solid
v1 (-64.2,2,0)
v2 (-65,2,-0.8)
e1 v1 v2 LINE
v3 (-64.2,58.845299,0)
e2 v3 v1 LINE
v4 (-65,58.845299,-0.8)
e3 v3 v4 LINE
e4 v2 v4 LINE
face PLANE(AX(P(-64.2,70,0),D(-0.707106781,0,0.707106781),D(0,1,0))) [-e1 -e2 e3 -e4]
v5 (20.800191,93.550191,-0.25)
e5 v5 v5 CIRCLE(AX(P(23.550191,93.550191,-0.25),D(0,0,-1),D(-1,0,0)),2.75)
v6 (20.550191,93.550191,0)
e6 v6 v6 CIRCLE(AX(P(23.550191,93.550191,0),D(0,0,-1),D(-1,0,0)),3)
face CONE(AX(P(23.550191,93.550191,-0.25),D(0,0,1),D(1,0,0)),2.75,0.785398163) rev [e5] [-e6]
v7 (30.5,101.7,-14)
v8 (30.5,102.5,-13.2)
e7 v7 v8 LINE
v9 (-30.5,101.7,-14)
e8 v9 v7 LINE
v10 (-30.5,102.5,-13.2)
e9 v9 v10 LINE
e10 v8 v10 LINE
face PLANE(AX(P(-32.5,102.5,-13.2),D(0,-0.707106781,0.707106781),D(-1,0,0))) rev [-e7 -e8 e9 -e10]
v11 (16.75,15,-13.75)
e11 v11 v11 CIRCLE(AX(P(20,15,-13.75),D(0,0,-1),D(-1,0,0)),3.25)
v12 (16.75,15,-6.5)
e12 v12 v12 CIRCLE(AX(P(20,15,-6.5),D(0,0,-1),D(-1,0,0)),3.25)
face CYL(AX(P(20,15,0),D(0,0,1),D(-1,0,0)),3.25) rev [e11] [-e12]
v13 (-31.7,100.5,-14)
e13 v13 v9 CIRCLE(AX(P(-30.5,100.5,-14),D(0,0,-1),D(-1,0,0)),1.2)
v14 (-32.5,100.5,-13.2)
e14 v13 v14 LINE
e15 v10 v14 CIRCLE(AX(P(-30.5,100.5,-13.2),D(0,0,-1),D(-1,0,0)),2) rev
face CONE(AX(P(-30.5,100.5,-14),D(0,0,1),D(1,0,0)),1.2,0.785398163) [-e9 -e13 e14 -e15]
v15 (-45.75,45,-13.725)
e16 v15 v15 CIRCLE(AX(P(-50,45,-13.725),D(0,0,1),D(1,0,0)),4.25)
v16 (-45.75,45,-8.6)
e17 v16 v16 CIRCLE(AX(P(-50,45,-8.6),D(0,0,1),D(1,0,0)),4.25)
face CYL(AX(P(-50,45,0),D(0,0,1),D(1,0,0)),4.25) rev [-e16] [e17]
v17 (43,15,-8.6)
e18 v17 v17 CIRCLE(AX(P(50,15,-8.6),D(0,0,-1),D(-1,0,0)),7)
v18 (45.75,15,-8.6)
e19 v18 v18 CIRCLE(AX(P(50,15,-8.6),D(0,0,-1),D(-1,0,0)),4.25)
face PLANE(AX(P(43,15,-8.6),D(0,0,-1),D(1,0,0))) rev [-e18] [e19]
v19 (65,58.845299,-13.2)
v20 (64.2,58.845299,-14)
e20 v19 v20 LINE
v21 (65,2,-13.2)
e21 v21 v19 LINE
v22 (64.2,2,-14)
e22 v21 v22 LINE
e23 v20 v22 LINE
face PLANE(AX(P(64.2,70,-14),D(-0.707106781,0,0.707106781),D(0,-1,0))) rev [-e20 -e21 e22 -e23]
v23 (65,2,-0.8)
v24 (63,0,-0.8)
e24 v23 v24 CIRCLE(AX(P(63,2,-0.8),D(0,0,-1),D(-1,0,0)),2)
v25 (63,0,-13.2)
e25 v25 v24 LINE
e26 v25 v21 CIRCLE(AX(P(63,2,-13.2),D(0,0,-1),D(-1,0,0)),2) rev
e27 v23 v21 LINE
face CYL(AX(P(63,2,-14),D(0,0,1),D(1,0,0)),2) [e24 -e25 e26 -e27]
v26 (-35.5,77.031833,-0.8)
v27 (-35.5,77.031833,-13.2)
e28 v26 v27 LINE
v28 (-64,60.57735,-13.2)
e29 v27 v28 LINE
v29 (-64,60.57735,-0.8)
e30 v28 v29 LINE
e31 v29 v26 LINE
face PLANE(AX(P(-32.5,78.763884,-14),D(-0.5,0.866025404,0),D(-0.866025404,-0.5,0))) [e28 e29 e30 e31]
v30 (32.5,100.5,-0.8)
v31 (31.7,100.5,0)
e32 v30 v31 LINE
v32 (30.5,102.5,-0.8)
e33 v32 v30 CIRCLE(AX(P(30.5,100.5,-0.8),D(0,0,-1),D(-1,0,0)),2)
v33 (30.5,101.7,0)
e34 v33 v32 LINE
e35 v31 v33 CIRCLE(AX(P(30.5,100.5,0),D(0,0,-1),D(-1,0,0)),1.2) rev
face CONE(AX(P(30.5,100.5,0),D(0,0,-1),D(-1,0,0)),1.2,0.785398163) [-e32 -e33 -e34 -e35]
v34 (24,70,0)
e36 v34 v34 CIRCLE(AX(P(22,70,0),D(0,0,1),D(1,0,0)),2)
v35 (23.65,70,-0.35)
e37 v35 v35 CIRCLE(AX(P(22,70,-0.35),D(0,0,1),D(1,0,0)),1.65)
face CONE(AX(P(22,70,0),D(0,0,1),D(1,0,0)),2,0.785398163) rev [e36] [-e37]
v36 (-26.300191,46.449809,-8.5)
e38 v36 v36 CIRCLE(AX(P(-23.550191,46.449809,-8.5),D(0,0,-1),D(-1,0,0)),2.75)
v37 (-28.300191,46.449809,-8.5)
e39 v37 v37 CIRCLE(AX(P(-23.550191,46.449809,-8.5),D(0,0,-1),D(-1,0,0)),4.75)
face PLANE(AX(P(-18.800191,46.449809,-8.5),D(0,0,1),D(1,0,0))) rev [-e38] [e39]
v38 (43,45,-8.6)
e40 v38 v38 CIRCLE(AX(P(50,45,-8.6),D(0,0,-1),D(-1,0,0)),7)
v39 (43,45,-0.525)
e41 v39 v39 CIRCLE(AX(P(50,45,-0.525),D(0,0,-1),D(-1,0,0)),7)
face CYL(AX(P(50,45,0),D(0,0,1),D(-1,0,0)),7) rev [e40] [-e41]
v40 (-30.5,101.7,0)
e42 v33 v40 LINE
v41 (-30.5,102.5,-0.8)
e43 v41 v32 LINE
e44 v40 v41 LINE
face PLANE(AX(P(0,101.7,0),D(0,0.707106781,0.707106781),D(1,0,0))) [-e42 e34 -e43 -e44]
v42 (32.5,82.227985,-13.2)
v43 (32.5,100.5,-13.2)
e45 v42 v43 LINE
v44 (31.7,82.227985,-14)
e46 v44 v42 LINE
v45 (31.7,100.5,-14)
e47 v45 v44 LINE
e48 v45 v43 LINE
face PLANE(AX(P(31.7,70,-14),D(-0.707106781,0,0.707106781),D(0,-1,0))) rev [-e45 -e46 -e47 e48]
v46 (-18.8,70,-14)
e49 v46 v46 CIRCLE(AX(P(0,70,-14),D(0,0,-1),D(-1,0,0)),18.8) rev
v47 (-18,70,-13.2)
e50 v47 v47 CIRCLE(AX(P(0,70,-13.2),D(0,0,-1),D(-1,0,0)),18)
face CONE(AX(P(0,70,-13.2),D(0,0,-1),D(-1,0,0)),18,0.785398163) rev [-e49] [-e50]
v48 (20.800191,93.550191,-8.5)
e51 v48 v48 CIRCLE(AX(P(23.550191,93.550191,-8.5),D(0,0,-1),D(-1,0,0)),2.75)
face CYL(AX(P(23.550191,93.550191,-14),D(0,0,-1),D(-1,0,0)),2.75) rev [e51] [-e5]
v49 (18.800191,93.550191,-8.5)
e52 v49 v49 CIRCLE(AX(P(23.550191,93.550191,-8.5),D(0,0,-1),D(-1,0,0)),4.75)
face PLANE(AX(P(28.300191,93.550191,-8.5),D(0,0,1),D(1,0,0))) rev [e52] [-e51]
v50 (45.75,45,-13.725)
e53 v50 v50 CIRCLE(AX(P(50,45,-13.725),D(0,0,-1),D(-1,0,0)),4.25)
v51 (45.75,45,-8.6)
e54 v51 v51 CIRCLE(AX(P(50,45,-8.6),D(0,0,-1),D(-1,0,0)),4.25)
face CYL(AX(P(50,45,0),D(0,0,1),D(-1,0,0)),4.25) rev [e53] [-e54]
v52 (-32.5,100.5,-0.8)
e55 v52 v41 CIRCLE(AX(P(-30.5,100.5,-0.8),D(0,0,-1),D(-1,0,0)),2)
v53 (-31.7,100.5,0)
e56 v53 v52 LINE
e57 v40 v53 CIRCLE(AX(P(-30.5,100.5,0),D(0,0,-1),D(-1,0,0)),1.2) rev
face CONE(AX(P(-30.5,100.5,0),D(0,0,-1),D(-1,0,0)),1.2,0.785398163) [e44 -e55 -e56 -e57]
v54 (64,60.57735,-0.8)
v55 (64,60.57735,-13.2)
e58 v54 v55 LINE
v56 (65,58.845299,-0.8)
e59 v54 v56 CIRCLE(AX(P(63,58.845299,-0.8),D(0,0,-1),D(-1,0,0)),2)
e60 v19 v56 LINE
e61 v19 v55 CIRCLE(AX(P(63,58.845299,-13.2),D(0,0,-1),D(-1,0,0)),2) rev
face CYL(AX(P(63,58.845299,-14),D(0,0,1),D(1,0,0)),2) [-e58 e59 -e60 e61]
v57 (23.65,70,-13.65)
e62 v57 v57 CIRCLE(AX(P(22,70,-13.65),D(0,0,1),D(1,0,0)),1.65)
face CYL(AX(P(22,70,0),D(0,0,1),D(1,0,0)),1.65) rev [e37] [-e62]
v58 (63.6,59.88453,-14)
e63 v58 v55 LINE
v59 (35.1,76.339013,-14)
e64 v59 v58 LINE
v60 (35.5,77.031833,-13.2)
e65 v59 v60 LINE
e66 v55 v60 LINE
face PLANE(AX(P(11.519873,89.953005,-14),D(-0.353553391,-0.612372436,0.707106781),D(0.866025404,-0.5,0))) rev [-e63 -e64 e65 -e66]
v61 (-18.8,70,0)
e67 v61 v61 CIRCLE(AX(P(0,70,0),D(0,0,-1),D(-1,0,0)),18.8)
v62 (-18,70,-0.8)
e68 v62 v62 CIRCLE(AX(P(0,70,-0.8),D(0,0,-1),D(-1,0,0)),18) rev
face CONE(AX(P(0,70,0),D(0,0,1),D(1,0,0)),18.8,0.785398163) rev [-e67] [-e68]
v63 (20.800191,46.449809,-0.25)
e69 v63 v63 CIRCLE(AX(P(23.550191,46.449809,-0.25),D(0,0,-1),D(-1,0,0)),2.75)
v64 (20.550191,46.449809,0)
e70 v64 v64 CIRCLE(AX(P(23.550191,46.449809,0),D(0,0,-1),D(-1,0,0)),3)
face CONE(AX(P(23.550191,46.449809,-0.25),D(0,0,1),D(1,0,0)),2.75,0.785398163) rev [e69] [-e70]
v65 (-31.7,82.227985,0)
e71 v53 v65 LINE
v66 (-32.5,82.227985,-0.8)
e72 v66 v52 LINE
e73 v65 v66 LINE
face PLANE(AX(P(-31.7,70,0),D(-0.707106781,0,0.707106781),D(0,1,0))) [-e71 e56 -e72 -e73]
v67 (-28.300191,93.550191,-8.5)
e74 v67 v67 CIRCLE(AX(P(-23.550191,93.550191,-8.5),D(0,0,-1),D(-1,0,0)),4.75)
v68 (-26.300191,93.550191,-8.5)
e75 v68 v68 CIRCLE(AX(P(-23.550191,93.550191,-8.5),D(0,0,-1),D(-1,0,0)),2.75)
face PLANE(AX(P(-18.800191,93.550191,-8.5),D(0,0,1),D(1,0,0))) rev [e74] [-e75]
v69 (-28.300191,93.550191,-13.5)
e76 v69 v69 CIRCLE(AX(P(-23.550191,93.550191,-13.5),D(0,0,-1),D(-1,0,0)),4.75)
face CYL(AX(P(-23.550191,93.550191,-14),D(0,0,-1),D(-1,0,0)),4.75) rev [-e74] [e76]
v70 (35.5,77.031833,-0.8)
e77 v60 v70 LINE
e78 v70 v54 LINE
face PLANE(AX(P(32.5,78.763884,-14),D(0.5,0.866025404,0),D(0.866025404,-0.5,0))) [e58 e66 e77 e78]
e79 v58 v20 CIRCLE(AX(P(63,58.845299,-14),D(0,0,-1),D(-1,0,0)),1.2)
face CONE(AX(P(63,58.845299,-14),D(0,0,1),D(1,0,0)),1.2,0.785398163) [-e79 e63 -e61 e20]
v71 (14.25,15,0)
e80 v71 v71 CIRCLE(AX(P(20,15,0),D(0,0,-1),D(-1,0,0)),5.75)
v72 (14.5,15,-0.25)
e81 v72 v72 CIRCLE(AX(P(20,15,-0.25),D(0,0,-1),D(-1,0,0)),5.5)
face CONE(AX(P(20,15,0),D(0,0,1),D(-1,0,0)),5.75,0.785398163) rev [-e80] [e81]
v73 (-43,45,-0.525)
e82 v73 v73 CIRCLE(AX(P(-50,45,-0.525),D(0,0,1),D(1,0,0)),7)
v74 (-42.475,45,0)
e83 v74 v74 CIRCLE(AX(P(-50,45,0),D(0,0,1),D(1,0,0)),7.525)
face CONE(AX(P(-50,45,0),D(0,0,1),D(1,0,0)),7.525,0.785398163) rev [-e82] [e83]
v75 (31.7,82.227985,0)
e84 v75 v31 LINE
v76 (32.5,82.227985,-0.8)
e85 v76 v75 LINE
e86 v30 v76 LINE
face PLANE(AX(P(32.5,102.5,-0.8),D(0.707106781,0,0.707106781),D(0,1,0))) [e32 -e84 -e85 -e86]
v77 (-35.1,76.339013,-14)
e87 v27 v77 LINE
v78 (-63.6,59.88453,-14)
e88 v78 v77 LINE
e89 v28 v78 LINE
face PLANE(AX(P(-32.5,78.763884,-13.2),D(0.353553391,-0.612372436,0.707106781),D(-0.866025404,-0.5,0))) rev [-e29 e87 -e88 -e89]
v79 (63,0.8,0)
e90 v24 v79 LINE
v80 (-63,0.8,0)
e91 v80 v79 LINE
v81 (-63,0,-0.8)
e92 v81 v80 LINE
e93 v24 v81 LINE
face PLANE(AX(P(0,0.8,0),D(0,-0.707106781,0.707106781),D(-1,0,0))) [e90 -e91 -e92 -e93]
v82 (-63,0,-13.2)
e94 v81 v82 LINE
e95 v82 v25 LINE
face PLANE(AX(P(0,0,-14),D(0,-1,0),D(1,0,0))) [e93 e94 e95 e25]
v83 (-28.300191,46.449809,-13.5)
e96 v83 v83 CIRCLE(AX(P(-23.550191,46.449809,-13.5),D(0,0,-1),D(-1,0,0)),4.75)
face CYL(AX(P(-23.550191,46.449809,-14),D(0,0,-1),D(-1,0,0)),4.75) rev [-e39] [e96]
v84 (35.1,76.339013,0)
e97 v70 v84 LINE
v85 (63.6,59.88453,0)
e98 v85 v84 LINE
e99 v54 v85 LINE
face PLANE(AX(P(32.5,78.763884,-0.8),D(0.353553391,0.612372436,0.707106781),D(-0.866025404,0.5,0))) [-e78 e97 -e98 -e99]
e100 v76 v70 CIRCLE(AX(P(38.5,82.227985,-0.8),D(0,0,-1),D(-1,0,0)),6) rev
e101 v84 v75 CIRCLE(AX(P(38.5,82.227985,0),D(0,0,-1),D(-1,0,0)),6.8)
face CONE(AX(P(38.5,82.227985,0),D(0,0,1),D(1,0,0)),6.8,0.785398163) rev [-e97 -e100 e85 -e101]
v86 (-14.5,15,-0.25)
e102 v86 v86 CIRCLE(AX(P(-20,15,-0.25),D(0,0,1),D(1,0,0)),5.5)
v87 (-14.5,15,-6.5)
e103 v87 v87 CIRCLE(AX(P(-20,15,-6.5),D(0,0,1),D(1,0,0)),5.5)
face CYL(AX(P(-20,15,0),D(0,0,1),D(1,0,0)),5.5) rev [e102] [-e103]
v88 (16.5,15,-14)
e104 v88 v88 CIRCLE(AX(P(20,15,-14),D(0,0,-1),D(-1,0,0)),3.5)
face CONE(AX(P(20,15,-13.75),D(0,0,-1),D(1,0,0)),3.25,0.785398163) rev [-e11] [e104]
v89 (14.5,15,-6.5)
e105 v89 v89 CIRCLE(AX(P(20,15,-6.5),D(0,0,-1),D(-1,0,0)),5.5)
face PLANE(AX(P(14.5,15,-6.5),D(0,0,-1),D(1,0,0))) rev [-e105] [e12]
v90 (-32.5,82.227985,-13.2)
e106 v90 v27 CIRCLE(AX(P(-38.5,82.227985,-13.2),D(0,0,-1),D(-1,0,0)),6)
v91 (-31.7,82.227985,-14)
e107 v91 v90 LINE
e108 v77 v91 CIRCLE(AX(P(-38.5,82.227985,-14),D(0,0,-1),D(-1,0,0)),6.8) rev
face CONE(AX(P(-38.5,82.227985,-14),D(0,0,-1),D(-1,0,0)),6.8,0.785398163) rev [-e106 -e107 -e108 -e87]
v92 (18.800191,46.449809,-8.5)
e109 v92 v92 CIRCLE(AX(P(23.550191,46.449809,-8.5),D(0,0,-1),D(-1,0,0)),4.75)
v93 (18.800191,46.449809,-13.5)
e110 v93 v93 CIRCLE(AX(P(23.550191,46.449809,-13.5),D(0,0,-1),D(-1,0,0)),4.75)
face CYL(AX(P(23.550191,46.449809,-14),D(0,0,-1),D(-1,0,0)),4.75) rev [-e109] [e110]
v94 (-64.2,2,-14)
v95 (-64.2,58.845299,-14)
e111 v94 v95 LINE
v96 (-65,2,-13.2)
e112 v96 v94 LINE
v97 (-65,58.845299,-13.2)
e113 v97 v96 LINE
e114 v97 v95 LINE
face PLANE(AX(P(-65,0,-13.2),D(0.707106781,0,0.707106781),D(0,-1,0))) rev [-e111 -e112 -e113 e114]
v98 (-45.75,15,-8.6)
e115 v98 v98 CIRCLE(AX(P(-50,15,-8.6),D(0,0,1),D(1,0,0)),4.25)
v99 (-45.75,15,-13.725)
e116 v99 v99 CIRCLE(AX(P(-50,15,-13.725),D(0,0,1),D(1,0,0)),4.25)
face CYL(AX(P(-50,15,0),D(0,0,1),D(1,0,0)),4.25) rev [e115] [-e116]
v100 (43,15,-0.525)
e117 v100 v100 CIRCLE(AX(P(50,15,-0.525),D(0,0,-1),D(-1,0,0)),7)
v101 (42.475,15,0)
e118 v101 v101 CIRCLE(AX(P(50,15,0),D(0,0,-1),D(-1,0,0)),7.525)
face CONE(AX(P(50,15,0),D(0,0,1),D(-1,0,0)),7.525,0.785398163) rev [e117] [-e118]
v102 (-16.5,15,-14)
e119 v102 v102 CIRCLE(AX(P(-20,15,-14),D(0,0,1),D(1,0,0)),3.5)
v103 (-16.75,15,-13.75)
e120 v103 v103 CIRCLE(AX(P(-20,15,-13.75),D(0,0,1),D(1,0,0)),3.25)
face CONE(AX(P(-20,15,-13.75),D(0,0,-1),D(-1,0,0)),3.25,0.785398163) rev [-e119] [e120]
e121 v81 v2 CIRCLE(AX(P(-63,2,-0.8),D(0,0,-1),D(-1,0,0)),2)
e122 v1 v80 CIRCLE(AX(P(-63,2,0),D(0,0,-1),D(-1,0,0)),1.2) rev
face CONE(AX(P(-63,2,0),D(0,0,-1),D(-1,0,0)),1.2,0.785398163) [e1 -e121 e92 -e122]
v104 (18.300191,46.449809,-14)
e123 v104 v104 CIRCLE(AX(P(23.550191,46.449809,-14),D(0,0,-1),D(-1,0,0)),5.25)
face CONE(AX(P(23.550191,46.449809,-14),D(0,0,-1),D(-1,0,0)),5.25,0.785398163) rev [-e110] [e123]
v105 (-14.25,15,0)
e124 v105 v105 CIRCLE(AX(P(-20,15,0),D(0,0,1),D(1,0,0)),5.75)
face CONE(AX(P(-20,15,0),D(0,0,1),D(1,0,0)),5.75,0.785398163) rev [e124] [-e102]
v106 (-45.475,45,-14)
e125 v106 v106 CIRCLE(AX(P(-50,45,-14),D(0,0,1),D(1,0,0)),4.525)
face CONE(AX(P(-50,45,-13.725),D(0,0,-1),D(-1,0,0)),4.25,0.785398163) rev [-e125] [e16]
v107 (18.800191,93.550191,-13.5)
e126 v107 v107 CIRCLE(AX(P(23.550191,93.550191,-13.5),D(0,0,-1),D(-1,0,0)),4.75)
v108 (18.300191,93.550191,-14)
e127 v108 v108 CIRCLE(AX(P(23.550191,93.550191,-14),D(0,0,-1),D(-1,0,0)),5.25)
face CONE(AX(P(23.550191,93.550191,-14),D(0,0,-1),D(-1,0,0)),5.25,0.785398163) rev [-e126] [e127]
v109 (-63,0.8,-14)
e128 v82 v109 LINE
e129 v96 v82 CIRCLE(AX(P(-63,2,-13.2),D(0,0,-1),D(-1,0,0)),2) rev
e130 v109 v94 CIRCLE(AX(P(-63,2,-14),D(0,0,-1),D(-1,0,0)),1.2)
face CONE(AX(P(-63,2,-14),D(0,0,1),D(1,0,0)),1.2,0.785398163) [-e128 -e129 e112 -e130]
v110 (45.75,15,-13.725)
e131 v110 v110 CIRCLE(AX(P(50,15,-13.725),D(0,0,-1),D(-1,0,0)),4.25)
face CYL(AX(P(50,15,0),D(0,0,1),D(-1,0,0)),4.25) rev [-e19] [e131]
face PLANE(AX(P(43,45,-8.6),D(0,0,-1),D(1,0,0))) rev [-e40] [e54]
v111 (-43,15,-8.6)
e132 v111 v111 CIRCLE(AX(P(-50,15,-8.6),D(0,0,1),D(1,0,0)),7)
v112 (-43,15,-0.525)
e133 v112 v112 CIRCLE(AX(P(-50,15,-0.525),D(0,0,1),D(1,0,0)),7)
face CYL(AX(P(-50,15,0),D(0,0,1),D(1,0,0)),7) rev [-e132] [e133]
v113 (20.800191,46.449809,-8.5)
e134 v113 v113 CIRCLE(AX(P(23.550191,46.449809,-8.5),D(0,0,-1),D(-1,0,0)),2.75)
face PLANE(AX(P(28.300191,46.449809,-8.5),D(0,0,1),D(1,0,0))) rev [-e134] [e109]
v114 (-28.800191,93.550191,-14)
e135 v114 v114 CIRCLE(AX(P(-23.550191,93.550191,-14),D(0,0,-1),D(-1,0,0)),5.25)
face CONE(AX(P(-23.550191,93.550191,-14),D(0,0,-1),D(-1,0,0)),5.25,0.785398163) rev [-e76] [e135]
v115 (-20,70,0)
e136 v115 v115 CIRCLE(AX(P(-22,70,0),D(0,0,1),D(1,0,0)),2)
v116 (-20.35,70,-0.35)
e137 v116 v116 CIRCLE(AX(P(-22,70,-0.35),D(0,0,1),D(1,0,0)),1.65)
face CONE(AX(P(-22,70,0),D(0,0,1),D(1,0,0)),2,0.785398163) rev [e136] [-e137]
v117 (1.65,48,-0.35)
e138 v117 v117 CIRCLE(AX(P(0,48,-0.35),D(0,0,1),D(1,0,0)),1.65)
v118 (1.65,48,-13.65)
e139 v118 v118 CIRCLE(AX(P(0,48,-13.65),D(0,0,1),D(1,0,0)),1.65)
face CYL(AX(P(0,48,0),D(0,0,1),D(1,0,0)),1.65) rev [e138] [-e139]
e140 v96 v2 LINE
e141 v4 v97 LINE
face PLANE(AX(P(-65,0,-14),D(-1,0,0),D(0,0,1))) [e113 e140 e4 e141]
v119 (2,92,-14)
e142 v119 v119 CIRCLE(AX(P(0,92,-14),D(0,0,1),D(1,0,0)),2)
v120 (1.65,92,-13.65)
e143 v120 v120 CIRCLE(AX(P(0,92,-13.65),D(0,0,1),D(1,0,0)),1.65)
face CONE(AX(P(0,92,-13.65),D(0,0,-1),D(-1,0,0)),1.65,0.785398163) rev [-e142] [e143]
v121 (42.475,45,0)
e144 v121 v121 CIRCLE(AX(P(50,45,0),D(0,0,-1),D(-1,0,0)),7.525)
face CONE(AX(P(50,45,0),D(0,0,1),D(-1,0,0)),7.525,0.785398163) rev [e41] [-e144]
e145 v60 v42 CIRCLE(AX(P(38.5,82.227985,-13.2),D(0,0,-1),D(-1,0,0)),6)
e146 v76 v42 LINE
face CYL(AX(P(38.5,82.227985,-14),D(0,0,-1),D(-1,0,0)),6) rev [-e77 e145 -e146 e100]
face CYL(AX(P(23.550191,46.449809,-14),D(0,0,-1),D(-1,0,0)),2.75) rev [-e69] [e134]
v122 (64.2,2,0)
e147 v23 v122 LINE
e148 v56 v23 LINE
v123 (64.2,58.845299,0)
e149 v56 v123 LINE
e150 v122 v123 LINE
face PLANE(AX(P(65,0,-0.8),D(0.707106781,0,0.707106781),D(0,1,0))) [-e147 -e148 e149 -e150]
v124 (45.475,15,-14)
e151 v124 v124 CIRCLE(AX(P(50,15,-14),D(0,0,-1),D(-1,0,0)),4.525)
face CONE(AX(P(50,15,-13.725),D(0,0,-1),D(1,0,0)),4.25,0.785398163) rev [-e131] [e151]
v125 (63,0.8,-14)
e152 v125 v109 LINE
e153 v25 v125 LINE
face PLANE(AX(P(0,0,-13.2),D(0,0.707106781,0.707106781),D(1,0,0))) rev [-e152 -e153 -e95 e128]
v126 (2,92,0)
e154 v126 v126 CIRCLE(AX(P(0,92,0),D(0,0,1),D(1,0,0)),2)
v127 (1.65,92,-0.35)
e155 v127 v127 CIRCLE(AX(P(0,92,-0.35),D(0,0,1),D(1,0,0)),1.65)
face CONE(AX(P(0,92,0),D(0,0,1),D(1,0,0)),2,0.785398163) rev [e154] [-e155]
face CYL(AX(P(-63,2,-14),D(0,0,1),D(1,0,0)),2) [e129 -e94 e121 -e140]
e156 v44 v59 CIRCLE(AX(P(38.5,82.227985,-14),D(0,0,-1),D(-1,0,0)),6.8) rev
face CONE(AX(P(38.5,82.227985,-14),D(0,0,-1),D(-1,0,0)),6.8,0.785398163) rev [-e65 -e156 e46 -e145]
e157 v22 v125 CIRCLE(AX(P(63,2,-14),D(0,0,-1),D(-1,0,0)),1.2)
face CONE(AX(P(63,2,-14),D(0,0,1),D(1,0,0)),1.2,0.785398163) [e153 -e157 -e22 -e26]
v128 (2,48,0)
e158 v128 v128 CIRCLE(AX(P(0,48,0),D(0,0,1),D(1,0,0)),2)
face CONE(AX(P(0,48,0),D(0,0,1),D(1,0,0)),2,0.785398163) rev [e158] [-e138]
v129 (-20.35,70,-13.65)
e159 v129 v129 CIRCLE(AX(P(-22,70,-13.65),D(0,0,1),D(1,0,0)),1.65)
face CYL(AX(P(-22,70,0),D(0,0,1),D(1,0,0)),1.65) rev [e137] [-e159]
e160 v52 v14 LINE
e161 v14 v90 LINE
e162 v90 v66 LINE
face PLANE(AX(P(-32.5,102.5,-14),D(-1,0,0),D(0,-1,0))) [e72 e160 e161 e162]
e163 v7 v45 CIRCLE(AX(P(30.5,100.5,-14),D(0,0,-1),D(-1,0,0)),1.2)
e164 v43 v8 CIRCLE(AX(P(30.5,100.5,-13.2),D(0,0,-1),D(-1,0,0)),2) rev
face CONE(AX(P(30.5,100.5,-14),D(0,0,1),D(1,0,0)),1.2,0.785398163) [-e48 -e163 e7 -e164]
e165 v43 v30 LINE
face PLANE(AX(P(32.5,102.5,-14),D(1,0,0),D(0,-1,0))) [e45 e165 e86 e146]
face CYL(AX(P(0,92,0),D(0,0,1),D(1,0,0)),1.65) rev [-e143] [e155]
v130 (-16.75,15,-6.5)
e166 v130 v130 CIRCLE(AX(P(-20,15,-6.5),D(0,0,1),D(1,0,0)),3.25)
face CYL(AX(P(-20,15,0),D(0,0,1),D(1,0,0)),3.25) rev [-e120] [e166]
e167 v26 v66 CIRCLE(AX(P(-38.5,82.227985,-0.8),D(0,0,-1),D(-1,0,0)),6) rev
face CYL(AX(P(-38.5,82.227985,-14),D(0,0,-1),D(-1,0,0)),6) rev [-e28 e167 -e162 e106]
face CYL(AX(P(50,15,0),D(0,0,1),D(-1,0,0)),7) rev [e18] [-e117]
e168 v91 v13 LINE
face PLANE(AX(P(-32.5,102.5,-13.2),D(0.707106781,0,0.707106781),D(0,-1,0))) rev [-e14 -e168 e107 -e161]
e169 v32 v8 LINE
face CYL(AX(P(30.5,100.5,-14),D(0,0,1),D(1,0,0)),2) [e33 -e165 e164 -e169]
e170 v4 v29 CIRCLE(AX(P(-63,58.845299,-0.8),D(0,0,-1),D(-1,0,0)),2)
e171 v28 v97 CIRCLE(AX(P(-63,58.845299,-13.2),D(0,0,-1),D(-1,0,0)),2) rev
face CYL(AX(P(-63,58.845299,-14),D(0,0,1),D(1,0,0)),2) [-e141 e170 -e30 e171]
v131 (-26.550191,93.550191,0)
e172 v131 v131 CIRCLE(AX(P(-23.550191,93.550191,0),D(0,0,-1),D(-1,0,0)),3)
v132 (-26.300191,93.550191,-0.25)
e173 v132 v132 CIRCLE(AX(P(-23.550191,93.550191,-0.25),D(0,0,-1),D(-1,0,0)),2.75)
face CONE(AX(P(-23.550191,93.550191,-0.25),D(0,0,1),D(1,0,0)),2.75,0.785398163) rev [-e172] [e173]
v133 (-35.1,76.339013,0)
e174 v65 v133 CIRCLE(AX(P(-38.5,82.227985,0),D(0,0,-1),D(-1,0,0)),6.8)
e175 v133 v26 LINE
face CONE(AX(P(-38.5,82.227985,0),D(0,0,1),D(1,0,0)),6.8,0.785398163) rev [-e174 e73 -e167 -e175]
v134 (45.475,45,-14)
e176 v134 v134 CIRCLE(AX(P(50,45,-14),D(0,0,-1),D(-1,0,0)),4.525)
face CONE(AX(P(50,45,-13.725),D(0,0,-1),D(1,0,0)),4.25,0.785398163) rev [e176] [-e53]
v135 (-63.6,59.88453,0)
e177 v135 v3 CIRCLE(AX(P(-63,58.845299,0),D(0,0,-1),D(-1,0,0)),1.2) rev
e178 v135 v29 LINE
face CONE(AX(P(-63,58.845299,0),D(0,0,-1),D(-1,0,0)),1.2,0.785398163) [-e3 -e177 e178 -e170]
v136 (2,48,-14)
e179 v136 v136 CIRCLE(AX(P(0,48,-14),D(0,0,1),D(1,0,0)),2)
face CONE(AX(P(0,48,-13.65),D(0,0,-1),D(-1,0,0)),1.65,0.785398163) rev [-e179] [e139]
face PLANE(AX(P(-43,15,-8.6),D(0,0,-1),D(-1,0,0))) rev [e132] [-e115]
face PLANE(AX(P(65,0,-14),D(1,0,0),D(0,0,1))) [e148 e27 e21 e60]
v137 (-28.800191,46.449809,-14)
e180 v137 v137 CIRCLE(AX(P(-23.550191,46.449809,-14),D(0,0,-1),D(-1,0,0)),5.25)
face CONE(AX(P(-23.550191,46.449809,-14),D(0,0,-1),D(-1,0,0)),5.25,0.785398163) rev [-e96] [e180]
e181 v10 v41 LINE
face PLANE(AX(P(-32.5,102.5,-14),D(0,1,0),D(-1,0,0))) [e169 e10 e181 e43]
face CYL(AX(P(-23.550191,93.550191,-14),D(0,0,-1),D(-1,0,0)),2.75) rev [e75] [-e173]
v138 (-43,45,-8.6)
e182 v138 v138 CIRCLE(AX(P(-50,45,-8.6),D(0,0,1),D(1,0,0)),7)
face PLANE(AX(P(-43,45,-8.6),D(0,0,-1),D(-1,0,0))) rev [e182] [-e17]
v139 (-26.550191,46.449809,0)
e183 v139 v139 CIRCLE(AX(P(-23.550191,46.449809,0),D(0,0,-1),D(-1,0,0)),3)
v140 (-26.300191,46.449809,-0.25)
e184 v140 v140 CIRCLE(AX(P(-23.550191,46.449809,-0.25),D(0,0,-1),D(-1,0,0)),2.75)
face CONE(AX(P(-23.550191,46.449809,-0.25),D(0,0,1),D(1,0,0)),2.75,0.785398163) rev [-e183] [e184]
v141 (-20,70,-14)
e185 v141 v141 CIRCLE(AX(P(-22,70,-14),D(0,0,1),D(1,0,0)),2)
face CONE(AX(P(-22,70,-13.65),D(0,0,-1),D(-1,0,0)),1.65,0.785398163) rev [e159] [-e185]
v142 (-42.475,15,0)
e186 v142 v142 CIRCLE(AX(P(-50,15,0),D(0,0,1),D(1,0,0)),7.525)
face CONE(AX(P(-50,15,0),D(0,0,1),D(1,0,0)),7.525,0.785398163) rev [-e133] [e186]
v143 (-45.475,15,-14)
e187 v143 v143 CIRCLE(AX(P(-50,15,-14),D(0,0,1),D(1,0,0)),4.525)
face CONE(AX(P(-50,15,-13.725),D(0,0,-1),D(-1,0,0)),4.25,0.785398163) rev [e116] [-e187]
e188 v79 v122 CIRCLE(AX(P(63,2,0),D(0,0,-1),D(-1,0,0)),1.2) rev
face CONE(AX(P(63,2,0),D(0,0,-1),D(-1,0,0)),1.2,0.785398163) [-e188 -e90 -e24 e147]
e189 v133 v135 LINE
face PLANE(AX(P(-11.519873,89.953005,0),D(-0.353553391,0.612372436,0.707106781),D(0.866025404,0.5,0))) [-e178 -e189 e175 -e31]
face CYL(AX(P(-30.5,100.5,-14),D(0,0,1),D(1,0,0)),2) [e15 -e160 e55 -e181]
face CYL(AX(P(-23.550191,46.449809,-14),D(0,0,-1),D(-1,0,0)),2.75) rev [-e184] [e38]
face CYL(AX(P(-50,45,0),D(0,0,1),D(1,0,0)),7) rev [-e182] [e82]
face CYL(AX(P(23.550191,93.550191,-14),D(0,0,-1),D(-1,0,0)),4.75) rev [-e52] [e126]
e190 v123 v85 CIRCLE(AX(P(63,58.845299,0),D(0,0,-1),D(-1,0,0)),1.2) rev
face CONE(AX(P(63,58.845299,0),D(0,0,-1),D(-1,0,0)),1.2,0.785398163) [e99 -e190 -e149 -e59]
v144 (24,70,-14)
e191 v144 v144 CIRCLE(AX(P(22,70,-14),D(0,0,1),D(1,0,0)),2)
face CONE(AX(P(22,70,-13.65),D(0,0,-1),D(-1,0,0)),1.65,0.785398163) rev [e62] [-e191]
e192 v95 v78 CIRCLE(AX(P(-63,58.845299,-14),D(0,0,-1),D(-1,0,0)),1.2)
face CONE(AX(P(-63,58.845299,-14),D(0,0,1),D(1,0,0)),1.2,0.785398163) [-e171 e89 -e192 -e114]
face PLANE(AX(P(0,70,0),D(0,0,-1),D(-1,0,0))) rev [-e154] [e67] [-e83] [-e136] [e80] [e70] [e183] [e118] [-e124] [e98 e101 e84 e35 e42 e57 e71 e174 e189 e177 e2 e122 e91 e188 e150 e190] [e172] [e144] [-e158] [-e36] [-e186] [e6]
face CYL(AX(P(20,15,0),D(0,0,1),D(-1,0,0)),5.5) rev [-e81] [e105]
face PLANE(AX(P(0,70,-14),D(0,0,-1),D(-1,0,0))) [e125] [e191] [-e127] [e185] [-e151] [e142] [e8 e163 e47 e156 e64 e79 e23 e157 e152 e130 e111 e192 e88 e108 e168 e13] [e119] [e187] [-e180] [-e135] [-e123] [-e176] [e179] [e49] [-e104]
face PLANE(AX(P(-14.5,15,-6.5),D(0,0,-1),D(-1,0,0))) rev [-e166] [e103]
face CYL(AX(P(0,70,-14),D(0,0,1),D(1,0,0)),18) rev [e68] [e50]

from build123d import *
from build123d.topology import SkipClean

# Parameters (mm, degrees)
BASE_FLANGE1_DEPTH                           = 14
CBORE_FOR_M8_HEX_SOCKET_HEAD_CAP_SCR_2_COUNT = 2
CBORE_FOR_M8_HEX_SOCKET_HEAD_CAP_SCR_2_PITCH = 30
M4_TAPPED_HOLE1_AT_2_COUNT                   = 2
M4_TAPPED_HOLE1_AT_2_PITCH                   = 31.112698372
M4_TAPPED_HOLE1_AT_3_COUNT                   = 2
M4_TAPPED_HOLE1_AT_3_PITCH                   = 44
M4_TAPPED_HOLE1_AT_4_COUNT                   = 2
M4_TAPPED_HOLE1_AT_4_PITCH                   = 31.112698372
CIRPATTERN1_COUNT                            = 4
FILLET2_R                                    = 6
FILLET1_R                                    = 2
CHAMFER1_SIZE                                = 0.8
CHAMFER2_SIZE                                = 0.8


# Sheet-metal steps are written as plain solids
with BuildPart() as part:
    # Sketch1 → Base-Flange1 (new body)
    with BuildSketch(Plane.XY):
        with BuildLine():
            Line((0, 0), (-65, 0))
            Line((-65, 0), (-65, 60))
            Line((-65, 60), (-32.5, 78.763883749))
            Line((-32.5, 78.763883749), (-32.5, 102.5))
            Line((-32.5, 102.5), (0, 102.5))
            Line((0, 102.5), (0, 88))
            ThreePointArc((0, 88), (-18, 70), (0, 52))
            Line((0, 52), (0, 0))
        make_face()
    extrude(amount=-BASE_FLANGE1_DEPTH)

    # Sketch7 → CBORE for M8 Hex Socket Head Cap Screw1 (revolve, cut)
    with BuildSketch(Plane(origin=(-50, 45, 0), x_dir=(0, -1, 0), z_dir=(1, 0, 0))):
        Polygon((0, 0), (0, 14), (4.525, 14), (4.25, 13.725), (4.25, 8.6), (7, 8.6), (7, 0.525), (7.525, 0), align=None)
    cbore_for_m8_hex_socket_head_cap_screw1 = revolve(axis=Axis((-50, 45, 6.35), (0, 0, -1)), mode=Mode.SUBTRACT)

    # CBORE for M8 Hex Socket Head Cap Scr 2: CBORE for M8 Hex Socket Head Cap Screw1 ×2
    with Locations(*[(0, -i * CBORE_FOR_M8_HEX_SOCKET_HEAD_CAP_SCR_2_PITCH, 0) for i in range(1, CBORE_FOR_M8_HEX_SOCKET_HEAD_CAP_SCR_2_COUNT)]):
        add(cbore_for_m8_hex_socket_head_cap_screw1, mode=Mode.SUBTRACT)

    # Sketch18 → CBORE for M6 Hex Socket Head Cap Screw1 (revolve, cut)
    with BuildSketch(Plane(origin=(-20, 15, 0), x_dir=(0, -1, 0), z_dir=(1, 0, 0))):
        Polygon((0, 0), (0, 14), (3.5, 14), (3.25, 13.75), (3.25, 6.5), (5.5, 6.5), (5.5, 0.25), (5.75, 0), align=None)
    revolve(axis=Axis((-20, 15, 6.35), (0, 0, -1)), mode=Mode.SUBTRACT)

    # Mirror1: part across plane


with BuildPart() as part_1:
    with SkipClean():  # the faces are left unmerged after this step: merging them gives an invalid solid
        add(part.part)
        add(part.part.mirror(Plane(origin=(0, 102.5, -14), x_dir=(0, 0, 1), z_dir=(1, 0, 0))))

    # Sketch12 → M4 Tapped Hole1 (revolve, cut)
    with SkipClean():  # the faces are left unmerged after this step: merging them gives an invalid solid
        with BuildSketch(Plane(origin=(-22, 70, 0), x_dir=(0, -1, 0), z_dir=(1, 0, 0))):
            Polygon((0, 0), (0, 14), (2, 14), (1.65, 13.65), (1.65, 0.35), (2, 0), align=None)
        m4_tapped_hole1 = revolve(axis=Axis((-22, 70, 6.35), (0, 0, -1)), mode=Mode.SUBTRACT)

    # M4 Tapped Hole1 at 2: M4 Tapped Hole1 ×2
    with SkipClean():  # the faces are left unmerged after this step: merging them gives an invalid solid
        with Locations(*[Vector(0.7071067811865477, 0.7071067811865474, 0) * (i * M4_TAPPED_HOLE1_AT_2_PITCH) for i in range(1, M4_TAPPED_HOLE1_AT_2_COUNT)]):
            add(m4_tapped_hole1, mode=Mode.SUBTRACT)

    # M4 Tapped Hole1 at 3: M4 Tapped Hole1 ×2
    with SkipClean():  # the faces are left unmerged after this step: merging them gives an invalid solid
        with Locations(*[(i * M4_TAPPED_HOLE1_AT_3_PITCH, 0, 0) for i in range(1, M4_TAPPED_HOLE1_AT_3_COUNT)]):
            add(m4_tapped_hole1, mode=Mode.SUBTRACT)

    # M4 Tapped Hole1 at 4: M4 Tapped Hole1 ×2
    with SkipClean():  # the faces are left unmerged after this step: merging them gives an invalid solid
        with Locations(*[Vector(0.7071067811865475, -0.7071067811865477, 0) * (i * M4_TAPPED_HOLE1_AT_4_PITCH) for i in range(1, M4_TAPPED_HOLE1_AT_4_COUNT)]):
            add(m4_tapped_hole1, mode=Mode.SUBTRACT)

    # Sketch15 → CBORE for M5 Hex Socket Head Cap Screw1 (revolve, cut)
    with SkipClean():  # the faces are left unmerged after this step: merging them gives an invalid solid
        with BuildSketch(Plane(origin=(23.550191347, 93.550191347, -14), x_dir=(0, 1, 0), z_dir=(1, 0, 0))):
            Polygon((0, 0), (0, 14), (3, 14), (2.75, 13.75), (2.75, 5.5), (4.75, 5.5), (4.75, 0.5), (5.25, 0), align=None)
        cbore_for_m5_hex_socket_head_cap_screw1 = revolve(axis=Axis((23.550191347, 93.550191347, -20.35), (0, 0, 1)), mode=Mode.SUBTRACT)

    # CirPattern1: CBORE for M5 Hex Socket Head Cap Screw1 ×4 about axis
    with SkipClean():  # the faces are left unmerged after this step: merging them gives an invalid solid
        cirpattern1_axis = Axis((0, 70, 0), (0, 0, 1))
        for i in range(1, CIRPATTERN1_COUNT):
            add(cbore_for_m5_hex_socket_head_cap_screw1.rotate(cirpattern1_axis, i * 360 / CIRPATTERN1_COUNT), mode=Mode.SUBTRACT)

    # Fillet2
    fillet2_edges = [part_1.edges().sort_by_distance(p)[0] for p in [
        (-32.5, 78.763883749, -7),
        (32.5, 78.763883749, -7),
    ]]
    fillet(fillet2_edges, radius=FILLET2_R)

    # Fillet1
    fillet1_edges = [part_1.edges().sort_by_distance(p)[0] for p in [
        (-65, 60, -7),
        (-32.5, 102.5, -7),
        (-65, 0, -7),
        (65, 60, -7),
        (32.5, 102.5, -7),
        (65, 0, -7),
    ]]
    fillet(fillet1_edges, radius=FILLET1_R)

    # Chamfer1
    chamfer1_edges = [part_1.edges().sort_by_distance(p)[0] for p in [
        (49.75, 68.804591605, 0),
        (49.75, 68.804591605, -14),
        (-49.75, 68.804591605, 0),
        (-49.75, 68.804591605, -14),
        (33.303847577, 79.227985364, 0),
        (33.303847577, 79.227985364, -14),
        (-33.303847577, 79.227985364, 0),
        (-33.303847577, 79.227985364, -14),
        (-31.5, 0, 0),
        (-31.5, 0, -14),
        (32.5, 91.363992682, 0),
        (-15.25, 102.5, 0),
        (-32.5, 91.363992682, 0),
        (-65, 30.422649731, 0),
        (65, 30.422649731, 0),
        (-64.732050808, 59.845299462, 0),
        (-31.914213562, 101.914213562, 0),
        (31.914213562, 101.914213562, 0),
        (64.732050808, 59.845299462, 0),
        (-64.414213562, 0.585786438, 0),
        (64.414213562, 0.585786438, 0),
        (65, 30.422649731, -14),
        (-15.25, 102.5, -14),
        (32.5, 91.363992682, -14),
        (-65, 30.422649731, -14),
        (-32.5, 91.363992682, -14),
        (-64.732050808, 59.845299462, -14),
        (-31.914213562, 101.914213562, -14),
        (31.914213562, 101.914213562, -14),
        (64.732050808, 59.845299462, -14),
        (-64.414213562, 0.585786438, -14),
        (64.414213562, 0.585786438, -14),
    ]]
    chamfer(chamfer1_edges, length=CHAMFER1_SIZE)

    # Chamfer2
    chamfer2_edges = [part_1.edges().sort_by_distance(p)[0] for p in [
        (-18, 70, 0),
        (-18, 70, -14),
    ]]
    chamfer(chamfer2_edges, length=CHAMFER2_SIZE)


solid = part_1.part
